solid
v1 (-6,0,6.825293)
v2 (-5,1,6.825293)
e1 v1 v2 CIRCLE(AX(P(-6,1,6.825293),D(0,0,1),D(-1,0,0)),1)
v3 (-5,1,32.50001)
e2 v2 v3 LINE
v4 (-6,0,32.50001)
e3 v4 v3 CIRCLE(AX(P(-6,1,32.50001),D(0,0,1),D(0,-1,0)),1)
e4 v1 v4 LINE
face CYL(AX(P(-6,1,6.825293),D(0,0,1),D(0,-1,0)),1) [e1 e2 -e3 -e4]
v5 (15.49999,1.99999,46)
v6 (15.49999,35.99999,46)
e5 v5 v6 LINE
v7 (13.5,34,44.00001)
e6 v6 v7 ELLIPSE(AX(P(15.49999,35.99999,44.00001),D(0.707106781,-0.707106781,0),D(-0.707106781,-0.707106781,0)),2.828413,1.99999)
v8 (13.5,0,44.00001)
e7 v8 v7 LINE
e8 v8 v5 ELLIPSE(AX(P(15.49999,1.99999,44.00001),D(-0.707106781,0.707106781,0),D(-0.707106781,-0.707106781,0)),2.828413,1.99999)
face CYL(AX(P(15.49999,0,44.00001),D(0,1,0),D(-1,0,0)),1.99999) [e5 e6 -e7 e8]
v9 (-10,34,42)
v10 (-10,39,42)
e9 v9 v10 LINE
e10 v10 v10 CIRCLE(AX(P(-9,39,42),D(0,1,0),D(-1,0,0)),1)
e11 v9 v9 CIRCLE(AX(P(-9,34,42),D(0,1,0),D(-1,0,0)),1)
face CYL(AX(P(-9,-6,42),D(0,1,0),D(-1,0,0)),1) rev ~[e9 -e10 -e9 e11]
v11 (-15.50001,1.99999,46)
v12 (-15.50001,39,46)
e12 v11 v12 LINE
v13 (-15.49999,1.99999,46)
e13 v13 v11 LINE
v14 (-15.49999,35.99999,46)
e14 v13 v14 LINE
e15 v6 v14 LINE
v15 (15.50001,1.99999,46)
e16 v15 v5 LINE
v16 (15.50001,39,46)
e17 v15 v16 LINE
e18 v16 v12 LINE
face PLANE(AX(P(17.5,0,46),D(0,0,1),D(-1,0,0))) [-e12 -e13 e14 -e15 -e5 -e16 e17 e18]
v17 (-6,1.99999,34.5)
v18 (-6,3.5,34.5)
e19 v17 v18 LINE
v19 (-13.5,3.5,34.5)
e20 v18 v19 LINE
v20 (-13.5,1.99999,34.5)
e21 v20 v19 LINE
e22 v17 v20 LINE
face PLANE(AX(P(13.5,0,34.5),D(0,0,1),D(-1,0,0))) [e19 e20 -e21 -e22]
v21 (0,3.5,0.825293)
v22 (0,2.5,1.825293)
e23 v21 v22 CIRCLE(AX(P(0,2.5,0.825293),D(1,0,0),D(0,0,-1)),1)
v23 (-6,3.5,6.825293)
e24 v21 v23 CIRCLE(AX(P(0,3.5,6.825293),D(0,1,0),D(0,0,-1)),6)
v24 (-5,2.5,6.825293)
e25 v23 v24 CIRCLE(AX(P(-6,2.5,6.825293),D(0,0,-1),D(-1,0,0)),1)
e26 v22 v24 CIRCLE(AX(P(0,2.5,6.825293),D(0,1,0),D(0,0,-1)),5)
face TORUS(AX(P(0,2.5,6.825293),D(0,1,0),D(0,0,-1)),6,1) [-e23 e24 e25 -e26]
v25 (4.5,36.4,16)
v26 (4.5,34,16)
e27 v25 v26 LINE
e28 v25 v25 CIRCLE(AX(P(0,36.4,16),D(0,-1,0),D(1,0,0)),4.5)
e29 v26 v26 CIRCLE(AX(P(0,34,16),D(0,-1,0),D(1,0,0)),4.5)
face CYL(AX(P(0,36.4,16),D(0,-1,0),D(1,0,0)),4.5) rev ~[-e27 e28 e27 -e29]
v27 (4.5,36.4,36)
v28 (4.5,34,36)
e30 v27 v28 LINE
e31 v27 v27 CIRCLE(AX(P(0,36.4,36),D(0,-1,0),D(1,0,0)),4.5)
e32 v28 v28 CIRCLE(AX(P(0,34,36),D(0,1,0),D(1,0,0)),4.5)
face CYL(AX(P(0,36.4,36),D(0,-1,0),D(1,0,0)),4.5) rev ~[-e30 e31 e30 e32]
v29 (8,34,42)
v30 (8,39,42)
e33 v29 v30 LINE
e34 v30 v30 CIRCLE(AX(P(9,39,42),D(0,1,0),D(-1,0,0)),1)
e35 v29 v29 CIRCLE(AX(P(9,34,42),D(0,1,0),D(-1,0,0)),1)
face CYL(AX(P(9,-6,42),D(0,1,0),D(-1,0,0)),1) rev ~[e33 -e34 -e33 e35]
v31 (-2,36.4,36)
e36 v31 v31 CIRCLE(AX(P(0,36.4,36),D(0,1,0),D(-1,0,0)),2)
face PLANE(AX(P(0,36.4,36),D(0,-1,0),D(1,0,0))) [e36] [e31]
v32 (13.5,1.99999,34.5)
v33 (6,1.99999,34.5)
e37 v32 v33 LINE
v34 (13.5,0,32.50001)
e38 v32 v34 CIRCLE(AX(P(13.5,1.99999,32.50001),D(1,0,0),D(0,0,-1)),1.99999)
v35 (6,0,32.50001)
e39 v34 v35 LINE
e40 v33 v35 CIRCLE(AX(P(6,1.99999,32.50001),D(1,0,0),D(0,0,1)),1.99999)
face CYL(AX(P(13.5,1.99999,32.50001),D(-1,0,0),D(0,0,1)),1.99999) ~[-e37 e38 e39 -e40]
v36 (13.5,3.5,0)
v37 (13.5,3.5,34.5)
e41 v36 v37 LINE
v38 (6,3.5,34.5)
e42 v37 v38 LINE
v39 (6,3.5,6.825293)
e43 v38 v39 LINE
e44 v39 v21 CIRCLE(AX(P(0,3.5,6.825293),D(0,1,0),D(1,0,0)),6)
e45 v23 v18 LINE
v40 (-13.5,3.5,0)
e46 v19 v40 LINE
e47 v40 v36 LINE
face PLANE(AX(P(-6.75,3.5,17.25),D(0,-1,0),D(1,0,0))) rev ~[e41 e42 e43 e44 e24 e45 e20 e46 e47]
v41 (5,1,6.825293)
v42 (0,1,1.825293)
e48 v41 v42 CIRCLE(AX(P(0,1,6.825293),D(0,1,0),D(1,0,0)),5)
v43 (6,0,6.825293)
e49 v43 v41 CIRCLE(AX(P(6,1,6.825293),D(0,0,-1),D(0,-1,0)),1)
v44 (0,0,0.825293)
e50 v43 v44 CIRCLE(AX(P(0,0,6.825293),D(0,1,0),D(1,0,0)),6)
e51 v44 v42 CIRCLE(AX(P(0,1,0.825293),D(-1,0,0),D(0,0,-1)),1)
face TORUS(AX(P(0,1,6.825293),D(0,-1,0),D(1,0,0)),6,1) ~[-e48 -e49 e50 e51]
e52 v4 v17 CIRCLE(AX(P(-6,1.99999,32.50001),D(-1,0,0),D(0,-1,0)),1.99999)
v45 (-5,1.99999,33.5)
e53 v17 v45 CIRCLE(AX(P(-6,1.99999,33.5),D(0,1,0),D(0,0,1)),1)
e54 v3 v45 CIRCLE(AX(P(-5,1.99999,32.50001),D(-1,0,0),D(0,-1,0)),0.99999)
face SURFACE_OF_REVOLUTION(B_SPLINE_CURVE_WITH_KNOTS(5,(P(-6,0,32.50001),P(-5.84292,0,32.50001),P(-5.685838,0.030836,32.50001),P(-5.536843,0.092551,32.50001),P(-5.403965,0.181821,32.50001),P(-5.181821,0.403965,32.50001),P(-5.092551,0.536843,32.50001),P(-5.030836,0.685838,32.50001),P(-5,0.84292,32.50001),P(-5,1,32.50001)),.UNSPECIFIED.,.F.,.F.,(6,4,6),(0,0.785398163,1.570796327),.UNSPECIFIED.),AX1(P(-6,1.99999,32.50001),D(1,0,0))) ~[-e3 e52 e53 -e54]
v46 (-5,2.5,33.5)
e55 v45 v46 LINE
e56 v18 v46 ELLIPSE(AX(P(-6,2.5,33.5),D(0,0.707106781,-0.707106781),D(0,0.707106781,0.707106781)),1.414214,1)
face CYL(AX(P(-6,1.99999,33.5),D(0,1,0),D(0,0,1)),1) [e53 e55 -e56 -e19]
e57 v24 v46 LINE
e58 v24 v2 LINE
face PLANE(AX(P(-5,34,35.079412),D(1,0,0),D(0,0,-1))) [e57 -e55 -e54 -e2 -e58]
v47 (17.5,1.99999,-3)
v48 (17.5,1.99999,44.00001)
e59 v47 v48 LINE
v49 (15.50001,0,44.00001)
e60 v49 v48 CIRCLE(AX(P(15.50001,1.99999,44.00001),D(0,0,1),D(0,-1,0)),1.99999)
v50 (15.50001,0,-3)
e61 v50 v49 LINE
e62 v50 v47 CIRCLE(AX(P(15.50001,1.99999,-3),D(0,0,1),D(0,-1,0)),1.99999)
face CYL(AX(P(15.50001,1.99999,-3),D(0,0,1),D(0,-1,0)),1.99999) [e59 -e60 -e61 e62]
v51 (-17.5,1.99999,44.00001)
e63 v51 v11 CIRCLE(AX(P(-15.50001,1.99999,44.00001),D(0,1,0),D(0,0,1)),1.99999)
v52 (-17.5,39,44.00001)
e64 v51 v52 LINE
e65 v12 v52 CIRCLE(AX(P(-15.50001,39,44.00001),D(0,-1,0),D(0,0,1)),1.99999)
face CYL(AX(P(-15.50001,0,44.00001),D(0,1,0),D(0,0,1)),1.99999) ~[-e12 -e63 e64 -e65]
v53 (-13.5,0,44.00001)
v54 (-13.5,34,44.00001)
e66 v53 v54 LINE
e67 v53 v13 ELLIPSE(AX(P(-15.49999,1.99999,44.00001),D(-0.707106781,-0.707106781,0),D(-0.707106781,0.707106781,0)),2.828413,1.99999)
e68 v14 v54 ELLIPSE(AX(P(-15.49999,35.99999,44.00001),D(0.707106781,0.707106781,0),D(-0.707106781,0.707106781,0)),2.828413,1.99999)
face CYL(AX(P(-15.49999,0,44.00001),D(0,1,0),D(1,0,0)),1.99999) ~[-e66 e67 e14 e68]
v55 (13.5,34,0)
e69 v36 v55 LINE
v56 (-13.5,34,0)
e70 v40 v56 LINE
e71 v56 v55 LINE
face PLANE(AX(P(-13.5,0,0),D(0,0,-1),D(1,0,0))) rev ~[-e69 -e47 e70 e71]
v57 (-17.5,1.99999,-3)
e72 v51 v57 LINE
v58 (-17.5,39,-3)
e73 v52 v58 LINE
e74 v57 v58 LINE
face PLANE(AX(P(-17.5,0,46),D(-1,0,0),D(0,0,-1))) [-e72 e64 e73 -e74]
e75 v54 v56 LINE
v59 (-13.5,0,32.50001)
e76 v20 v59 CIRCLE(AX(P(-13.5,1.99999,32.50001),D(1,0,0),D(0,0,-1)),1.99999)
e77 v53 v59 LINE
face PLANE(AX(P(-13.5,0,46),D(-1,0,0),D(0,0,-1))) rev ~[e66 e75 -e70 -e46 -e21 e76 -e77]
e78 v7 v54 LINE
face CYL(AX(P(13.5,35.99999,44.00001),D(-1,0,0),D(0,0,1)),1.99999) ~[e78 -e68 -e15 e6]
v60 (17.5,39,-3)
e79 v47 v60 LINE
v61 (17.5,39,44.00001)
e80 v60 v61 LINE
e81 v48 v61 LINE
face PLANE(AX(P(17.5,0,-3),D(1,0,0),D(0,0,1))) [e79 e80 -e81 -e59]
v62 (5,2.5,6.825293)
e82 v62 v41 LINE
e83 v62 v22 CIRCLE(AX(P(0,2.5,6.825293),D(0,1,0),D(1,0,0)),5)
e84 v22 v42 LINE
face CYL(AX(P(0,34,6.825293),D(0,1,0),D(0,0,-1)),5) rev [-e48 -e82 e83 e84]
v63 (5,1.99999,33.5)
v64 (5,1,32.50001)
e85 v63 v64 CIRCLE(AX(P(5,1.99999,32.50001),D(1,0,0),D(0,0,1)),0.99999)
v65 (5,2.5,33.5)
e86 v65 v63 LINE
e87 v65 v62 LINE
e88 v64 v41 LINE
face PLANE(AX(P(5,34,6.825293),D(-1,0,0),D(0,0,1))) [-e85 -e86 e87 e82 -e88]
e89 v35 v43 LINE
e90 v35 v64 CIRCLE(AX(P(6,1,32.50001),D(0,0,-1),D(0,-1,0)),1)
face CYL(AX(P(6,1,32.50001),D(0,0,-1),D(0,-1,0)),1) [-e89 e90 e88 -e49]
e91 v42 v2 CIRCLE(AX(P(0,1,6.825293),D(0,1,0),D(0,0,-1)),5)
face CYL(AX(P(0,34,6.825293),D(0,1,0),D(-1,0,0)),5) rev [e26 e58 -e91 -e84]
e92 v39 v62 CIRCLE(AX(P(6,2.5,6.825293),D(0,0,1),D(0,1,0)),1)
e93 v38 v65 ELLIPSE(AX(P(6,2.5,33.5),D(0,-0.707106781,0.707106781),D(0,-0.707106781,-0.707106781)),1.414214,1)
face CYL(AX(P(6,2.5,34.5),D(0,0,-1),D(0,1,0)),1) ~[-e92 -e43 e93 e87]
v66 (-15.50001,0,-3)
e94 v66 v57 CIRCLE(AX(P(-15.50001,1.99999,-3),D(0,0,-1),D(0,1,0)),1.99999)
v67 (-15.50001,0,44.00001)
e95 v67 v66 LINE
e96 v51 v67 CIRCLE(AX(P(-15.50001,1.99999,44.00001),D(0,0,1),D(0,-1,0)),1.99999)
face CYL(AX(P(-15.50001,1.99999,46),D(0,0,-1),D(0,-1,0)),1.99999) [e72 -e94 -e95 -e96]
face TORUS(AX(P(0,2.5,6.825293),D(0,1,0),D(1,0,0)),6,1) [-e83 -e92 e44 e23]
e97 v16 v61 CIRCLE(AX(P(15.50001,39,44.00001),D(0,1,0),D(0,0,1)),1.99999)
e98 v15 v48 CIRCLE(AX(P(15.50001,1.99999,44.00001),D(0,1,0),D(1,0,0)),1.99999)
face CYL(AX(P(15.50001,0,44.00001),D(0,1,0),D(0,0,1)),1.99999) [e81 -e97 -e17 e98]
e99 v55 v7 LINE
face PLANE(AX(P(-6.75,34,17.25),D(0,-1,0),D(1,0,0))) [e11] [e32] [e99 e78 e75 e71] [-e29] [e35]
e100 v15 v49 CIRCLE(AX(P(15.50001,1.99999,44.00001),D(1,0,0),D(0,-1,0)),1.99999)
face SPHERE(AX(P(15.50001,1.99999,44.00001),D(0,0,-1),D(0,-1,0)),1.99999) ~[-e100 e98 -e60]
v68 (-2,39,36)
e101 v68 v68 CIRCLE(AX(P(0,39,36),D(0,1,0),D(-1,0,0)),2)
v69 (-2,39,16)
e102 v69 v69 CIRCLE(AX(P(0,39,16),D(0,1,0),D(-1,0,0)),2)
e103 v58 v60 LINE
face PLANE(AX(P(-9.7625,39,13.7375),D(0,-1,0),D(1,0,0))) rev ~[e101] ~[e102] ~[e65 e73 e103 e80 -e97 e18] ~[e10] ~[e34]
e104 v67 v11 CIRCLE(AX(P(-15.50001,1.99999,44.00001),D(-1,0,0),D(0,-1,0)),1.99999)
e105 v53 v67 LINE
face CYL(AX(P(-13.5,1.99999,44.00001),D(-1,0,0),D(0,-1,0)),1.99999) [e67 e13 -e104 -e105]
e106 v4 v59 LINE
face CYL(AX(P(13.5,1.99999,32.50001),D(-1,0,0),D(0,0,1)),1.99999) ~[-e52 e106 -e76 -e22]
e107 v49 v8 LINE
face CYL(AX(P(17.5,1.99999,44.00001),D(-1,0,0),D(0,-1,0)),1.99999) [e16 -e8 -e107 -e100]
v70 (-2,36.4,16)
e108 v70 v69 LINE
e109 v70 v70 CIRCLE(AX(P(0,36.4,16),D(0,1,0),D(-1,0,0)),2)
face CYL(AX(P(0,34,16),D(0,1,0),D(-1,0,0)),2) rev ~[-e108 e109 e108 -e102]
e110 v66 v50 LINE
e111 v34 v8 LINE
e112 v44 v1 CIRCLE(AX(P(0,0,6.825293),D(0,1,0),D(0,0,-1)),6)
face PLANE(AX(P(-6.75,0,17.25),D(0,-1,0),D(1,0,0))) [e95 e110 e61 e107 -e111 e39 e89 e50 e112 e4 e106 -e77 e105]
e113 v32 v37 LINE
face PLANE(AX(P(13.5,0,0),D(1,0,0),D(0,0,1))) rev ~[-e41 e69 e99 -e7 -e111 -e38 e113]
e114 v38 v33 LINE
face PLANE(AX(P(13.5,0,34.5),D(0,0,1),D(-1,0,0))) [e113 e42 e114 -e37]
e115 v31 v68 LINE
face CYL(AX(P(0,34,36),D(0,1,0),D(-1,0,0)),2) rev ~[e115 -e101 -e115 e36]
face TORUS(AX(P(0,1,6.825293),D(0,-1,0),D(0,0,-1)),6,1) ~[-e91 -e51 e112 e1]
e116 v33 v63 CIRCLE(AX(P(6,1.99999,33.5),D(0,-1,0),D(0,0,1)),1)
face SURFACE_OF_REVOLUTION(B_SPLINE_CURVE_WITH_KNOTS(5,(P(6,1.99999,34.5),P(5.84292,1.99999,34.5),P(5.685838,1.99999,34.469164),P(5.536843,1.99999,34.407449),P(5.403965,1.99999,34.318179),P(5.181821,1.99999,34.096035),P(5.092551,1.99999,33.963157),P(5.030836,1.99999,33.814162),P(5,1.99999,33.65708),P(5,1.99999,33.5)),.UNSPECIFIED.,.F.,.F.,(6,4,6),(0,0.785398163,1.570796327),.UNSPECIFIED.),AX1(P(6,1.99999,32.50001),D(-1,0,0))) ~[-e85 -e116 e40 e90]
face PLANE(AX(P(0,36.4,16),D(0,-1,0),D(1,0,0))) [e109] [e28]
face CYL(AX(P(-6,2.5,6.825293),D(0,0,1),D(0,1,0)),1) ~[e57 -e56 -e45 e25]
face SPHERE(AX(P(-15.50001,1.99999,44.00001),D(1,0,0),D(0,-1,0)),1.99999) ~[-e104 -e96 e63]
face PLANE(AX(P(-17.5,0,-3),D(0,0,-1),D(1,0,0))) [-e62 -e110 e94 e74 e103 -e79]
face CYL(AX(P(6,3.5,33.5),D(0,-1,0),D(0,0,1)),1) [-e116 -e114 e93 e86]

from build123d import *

# Parameters (mm, degrees)
F0_W           = 9
F0_H           = 7.5
F0_W_2         = 13.5
F0_H_2         = 34.5
F1_DEPTH       = 39
F2_DEPTH       = 34
F3_D           = 2
F3_DEPTH       = 40
F3_START       = 34
F3_TIP         = 0.600860619
F4_DEPTH       = 3.5
F5_R           = 1.99999
F7_D           = 4
F7_DEPTH       = 10
F7_CBORE_D     = 9
F7_CBORE_DEPTH = 2.4
F7_TIP         = 1.2017212381
F8_DEPTH       = 50
F9_R           = 1


# Not quite as in the source:
# - a fillet or chamfer is up to 0.001 mm smaller than in the source, because OpenCascade refuses the exact size


with BuildPart() as f1:
    # F0 (on Front) → F1 (new body)
    with BuildSketch(Plane.XZ):
        Polygon((13.5, 0), (0, 0), (-13.5, 0), (-13.5, 34.5), (-13.5, 36), (-13.5, 46), (-17.5, 46), (-17.5, 0), (-17.5, -3), (-13.5, -3), (13.5, -3), align=None)
        Polygon((13.5, 34.5), (13.5, 0), (13.5, -3), (17.5, -3), (17.5, 0), (17.5, 46), (13.5, 46), align=None)
        Polygon((-13.5, 0), (0, 0), (0, 34.5), (-9, 34.5), (-13.5, 34.5), align=None)
        Polygon((0, 42), (0, 34.5), (13.5, 34.5), (13.5, 46), (-13.5, 46), (-13.5, 36), (-13.5, 34.5), (-9, 34.5), (-9, 42), align=None)
        with Locations((-4.5, 38.25)):
            Rectangle(F0_W, F0_H)
        with Locations((6.75, 17.25)):
            Rectangle(F0_W_2, F0_H_2)
    extrude(amount=-F1_DEPTH)

    # F0 (on Front) → F2 (cut)
    with BuildSketch(Plane.XZ):
        Polygon((-13.5, 0), (0, 0), (0, 34.5), (-9, 34.5), (-13.5, 34.5), align=None)
        with Locations((6.75, 17.25)):
            Rectangle(F0_W_2, F0_H_2)
        Polygon((0, 42), (0, 34.5), (13.5, 34.5), (13.5, 46), (-13.5, 46), (-13.5, 36), (-13.5, 34.5), (-9, 34.5), (-9, 42), align=None)
        with Locations((-4.5, 38.25)):
            Rectangle(F0_W, F0_H)
    extrude(amount=-F2_DEPTH, mode=Mode.SUBTRACT)

    # F3
    # its depths count from where the whole tool has entered the part; down to there all is cleared
    with Locations(Plane.XZ.offset(-F3_START)):
        with Locations((-9, 42), (9, 42)):
            Hole(F3_D / 2, depth=F3_DEPTH)
            with Locations((0, 0, -(F3_DEPTH + F3_TIP / 2))):  # 118° drill point
                Cone(0, F3_D / 2, F3_TIP, mode=Mode.SUBTRACT)

    # F0 (on Front) → F4 (join)
    with BuildSketch(Plane.XZ):
        Polygon((-13.5, 0), (0, 0), (0, 34.5), (-9, 34.5), (-13.5, 34.5), align=None)
        with Locations((6.75, 17.25)):
            Rectangle(F0_W_2, F0_H_2)
    extrude(amount=-F4_DEPTH)

    # F5 (radius 2 in the source; OpenCascade refuses exactly that, so slightly less here)
    f5_edges = [f1.edges().sort_by_distance(p)[0] for p in [
        (-15.5, 0, 46),
        (-17.5, 0, 21.5),
        (17.5, 0, 21.5),
        (15.5, 0, 46),
        (-17.5, 19.5, 46),
        (17.5, 19.5, 46),
        (0, 34, 46),
        (13.5, 17, 46),
        (-13.5, 17, 46),
        (0, 0, 34.5),
    ]]
    fillet(f5_edges, radius=F5_R)

    # F7
    with Locations(Plane.XZ.offset(-34)):
        with Locations((0, 36), (0, 16)):
            CounterBoreHole(F7_D / 2, F7_CBORE_D / 2, F7_CBORE_DEPTH, depth=F7_DEPTH)
            with Locations((0, 0, -(F7_DEPTH + F7_TIP / 2))):  # 118° drill point
                Cone(0, F7_D / 2, F7_TIP, mode=Mode.SUBTRACT)

    # F6 (on face) → F8 (cut)
    with BuildSketch(Plane.XZ.offset(-34)):
        with BuildLine():
            ThreePointArc((-5, 6.8252934143), (-3.5355339059, 3.2897595084), (0, 1.8252934143))
            Line((0, 1.8252934143), (0, 6.8252934143))
            Line((0, 6.8252934143), (-5, 6.8252934143))
        make_face()
        with BuildLine():
            Line((0, 6.8252934143), (0, 1.8252934143))
            ThreePointArc((0, 1.8252934143), (3.5355339059, 3.2897595084), (5, 6.8252934143))
            ThreePointArc((5, 6.8252934143), (3.5355339059, 10.3608273202), (0, 11.8252934143))
            Line((0, 11.8252934143), (0, 6.8252934143))
        make_face()
        with BuildLine():
            Line((-5, 6.8252934143), (0, 6.8252934143))
            Line((0, 6.8252934143), (0, 11.8252934143))
            ThreePointArc((0, 11.8252934143), (-3.5355339059, 10.3608273202), (-5, 6.8252934143))
        make_face()
        with BuildLine():
            Line((-5, 35.0794121623), (-5, 6.8252934143))
            ThreePointArc((-5, 6.8252934143), (-3.5355339059, 10.3608273202), (0, 11.8252934143))
            Line((0, 11.8252934143), (0, 16))
            Line((0, 16), (0, 35.0794121623))
            Line((0, 35.0794121623), (-5, 35.0794121623))
        make_face()
        with BuildLine():
            ThreePointArc((0, 11.8252934143), (3.5355339059, 10.3608273202), (5, 6.8252934143))
            Line((5, 6.8252934143), (5, 35.0794121623))
            Line((5, 35.0794121623), (0, 35.0794121623))
            Line((0, 35.0794121623), (0, 16))
            Line((0, 16), (0, 11.8252934143))
        make_face()
    extrude(amount=F8_DEPTH, mode=Mode.SUBTRACT)

    # F9
    f9_edges = [f1.edges().sort_by_distance(p)[0] for p in [
        (5, 3.5, 20.662647),
        (5, 0, 19.662652),
        (0, 3.5, 1.825293),
    ]]
    fillet(f9_edges, radius=F9_R)


solid = f1.part
